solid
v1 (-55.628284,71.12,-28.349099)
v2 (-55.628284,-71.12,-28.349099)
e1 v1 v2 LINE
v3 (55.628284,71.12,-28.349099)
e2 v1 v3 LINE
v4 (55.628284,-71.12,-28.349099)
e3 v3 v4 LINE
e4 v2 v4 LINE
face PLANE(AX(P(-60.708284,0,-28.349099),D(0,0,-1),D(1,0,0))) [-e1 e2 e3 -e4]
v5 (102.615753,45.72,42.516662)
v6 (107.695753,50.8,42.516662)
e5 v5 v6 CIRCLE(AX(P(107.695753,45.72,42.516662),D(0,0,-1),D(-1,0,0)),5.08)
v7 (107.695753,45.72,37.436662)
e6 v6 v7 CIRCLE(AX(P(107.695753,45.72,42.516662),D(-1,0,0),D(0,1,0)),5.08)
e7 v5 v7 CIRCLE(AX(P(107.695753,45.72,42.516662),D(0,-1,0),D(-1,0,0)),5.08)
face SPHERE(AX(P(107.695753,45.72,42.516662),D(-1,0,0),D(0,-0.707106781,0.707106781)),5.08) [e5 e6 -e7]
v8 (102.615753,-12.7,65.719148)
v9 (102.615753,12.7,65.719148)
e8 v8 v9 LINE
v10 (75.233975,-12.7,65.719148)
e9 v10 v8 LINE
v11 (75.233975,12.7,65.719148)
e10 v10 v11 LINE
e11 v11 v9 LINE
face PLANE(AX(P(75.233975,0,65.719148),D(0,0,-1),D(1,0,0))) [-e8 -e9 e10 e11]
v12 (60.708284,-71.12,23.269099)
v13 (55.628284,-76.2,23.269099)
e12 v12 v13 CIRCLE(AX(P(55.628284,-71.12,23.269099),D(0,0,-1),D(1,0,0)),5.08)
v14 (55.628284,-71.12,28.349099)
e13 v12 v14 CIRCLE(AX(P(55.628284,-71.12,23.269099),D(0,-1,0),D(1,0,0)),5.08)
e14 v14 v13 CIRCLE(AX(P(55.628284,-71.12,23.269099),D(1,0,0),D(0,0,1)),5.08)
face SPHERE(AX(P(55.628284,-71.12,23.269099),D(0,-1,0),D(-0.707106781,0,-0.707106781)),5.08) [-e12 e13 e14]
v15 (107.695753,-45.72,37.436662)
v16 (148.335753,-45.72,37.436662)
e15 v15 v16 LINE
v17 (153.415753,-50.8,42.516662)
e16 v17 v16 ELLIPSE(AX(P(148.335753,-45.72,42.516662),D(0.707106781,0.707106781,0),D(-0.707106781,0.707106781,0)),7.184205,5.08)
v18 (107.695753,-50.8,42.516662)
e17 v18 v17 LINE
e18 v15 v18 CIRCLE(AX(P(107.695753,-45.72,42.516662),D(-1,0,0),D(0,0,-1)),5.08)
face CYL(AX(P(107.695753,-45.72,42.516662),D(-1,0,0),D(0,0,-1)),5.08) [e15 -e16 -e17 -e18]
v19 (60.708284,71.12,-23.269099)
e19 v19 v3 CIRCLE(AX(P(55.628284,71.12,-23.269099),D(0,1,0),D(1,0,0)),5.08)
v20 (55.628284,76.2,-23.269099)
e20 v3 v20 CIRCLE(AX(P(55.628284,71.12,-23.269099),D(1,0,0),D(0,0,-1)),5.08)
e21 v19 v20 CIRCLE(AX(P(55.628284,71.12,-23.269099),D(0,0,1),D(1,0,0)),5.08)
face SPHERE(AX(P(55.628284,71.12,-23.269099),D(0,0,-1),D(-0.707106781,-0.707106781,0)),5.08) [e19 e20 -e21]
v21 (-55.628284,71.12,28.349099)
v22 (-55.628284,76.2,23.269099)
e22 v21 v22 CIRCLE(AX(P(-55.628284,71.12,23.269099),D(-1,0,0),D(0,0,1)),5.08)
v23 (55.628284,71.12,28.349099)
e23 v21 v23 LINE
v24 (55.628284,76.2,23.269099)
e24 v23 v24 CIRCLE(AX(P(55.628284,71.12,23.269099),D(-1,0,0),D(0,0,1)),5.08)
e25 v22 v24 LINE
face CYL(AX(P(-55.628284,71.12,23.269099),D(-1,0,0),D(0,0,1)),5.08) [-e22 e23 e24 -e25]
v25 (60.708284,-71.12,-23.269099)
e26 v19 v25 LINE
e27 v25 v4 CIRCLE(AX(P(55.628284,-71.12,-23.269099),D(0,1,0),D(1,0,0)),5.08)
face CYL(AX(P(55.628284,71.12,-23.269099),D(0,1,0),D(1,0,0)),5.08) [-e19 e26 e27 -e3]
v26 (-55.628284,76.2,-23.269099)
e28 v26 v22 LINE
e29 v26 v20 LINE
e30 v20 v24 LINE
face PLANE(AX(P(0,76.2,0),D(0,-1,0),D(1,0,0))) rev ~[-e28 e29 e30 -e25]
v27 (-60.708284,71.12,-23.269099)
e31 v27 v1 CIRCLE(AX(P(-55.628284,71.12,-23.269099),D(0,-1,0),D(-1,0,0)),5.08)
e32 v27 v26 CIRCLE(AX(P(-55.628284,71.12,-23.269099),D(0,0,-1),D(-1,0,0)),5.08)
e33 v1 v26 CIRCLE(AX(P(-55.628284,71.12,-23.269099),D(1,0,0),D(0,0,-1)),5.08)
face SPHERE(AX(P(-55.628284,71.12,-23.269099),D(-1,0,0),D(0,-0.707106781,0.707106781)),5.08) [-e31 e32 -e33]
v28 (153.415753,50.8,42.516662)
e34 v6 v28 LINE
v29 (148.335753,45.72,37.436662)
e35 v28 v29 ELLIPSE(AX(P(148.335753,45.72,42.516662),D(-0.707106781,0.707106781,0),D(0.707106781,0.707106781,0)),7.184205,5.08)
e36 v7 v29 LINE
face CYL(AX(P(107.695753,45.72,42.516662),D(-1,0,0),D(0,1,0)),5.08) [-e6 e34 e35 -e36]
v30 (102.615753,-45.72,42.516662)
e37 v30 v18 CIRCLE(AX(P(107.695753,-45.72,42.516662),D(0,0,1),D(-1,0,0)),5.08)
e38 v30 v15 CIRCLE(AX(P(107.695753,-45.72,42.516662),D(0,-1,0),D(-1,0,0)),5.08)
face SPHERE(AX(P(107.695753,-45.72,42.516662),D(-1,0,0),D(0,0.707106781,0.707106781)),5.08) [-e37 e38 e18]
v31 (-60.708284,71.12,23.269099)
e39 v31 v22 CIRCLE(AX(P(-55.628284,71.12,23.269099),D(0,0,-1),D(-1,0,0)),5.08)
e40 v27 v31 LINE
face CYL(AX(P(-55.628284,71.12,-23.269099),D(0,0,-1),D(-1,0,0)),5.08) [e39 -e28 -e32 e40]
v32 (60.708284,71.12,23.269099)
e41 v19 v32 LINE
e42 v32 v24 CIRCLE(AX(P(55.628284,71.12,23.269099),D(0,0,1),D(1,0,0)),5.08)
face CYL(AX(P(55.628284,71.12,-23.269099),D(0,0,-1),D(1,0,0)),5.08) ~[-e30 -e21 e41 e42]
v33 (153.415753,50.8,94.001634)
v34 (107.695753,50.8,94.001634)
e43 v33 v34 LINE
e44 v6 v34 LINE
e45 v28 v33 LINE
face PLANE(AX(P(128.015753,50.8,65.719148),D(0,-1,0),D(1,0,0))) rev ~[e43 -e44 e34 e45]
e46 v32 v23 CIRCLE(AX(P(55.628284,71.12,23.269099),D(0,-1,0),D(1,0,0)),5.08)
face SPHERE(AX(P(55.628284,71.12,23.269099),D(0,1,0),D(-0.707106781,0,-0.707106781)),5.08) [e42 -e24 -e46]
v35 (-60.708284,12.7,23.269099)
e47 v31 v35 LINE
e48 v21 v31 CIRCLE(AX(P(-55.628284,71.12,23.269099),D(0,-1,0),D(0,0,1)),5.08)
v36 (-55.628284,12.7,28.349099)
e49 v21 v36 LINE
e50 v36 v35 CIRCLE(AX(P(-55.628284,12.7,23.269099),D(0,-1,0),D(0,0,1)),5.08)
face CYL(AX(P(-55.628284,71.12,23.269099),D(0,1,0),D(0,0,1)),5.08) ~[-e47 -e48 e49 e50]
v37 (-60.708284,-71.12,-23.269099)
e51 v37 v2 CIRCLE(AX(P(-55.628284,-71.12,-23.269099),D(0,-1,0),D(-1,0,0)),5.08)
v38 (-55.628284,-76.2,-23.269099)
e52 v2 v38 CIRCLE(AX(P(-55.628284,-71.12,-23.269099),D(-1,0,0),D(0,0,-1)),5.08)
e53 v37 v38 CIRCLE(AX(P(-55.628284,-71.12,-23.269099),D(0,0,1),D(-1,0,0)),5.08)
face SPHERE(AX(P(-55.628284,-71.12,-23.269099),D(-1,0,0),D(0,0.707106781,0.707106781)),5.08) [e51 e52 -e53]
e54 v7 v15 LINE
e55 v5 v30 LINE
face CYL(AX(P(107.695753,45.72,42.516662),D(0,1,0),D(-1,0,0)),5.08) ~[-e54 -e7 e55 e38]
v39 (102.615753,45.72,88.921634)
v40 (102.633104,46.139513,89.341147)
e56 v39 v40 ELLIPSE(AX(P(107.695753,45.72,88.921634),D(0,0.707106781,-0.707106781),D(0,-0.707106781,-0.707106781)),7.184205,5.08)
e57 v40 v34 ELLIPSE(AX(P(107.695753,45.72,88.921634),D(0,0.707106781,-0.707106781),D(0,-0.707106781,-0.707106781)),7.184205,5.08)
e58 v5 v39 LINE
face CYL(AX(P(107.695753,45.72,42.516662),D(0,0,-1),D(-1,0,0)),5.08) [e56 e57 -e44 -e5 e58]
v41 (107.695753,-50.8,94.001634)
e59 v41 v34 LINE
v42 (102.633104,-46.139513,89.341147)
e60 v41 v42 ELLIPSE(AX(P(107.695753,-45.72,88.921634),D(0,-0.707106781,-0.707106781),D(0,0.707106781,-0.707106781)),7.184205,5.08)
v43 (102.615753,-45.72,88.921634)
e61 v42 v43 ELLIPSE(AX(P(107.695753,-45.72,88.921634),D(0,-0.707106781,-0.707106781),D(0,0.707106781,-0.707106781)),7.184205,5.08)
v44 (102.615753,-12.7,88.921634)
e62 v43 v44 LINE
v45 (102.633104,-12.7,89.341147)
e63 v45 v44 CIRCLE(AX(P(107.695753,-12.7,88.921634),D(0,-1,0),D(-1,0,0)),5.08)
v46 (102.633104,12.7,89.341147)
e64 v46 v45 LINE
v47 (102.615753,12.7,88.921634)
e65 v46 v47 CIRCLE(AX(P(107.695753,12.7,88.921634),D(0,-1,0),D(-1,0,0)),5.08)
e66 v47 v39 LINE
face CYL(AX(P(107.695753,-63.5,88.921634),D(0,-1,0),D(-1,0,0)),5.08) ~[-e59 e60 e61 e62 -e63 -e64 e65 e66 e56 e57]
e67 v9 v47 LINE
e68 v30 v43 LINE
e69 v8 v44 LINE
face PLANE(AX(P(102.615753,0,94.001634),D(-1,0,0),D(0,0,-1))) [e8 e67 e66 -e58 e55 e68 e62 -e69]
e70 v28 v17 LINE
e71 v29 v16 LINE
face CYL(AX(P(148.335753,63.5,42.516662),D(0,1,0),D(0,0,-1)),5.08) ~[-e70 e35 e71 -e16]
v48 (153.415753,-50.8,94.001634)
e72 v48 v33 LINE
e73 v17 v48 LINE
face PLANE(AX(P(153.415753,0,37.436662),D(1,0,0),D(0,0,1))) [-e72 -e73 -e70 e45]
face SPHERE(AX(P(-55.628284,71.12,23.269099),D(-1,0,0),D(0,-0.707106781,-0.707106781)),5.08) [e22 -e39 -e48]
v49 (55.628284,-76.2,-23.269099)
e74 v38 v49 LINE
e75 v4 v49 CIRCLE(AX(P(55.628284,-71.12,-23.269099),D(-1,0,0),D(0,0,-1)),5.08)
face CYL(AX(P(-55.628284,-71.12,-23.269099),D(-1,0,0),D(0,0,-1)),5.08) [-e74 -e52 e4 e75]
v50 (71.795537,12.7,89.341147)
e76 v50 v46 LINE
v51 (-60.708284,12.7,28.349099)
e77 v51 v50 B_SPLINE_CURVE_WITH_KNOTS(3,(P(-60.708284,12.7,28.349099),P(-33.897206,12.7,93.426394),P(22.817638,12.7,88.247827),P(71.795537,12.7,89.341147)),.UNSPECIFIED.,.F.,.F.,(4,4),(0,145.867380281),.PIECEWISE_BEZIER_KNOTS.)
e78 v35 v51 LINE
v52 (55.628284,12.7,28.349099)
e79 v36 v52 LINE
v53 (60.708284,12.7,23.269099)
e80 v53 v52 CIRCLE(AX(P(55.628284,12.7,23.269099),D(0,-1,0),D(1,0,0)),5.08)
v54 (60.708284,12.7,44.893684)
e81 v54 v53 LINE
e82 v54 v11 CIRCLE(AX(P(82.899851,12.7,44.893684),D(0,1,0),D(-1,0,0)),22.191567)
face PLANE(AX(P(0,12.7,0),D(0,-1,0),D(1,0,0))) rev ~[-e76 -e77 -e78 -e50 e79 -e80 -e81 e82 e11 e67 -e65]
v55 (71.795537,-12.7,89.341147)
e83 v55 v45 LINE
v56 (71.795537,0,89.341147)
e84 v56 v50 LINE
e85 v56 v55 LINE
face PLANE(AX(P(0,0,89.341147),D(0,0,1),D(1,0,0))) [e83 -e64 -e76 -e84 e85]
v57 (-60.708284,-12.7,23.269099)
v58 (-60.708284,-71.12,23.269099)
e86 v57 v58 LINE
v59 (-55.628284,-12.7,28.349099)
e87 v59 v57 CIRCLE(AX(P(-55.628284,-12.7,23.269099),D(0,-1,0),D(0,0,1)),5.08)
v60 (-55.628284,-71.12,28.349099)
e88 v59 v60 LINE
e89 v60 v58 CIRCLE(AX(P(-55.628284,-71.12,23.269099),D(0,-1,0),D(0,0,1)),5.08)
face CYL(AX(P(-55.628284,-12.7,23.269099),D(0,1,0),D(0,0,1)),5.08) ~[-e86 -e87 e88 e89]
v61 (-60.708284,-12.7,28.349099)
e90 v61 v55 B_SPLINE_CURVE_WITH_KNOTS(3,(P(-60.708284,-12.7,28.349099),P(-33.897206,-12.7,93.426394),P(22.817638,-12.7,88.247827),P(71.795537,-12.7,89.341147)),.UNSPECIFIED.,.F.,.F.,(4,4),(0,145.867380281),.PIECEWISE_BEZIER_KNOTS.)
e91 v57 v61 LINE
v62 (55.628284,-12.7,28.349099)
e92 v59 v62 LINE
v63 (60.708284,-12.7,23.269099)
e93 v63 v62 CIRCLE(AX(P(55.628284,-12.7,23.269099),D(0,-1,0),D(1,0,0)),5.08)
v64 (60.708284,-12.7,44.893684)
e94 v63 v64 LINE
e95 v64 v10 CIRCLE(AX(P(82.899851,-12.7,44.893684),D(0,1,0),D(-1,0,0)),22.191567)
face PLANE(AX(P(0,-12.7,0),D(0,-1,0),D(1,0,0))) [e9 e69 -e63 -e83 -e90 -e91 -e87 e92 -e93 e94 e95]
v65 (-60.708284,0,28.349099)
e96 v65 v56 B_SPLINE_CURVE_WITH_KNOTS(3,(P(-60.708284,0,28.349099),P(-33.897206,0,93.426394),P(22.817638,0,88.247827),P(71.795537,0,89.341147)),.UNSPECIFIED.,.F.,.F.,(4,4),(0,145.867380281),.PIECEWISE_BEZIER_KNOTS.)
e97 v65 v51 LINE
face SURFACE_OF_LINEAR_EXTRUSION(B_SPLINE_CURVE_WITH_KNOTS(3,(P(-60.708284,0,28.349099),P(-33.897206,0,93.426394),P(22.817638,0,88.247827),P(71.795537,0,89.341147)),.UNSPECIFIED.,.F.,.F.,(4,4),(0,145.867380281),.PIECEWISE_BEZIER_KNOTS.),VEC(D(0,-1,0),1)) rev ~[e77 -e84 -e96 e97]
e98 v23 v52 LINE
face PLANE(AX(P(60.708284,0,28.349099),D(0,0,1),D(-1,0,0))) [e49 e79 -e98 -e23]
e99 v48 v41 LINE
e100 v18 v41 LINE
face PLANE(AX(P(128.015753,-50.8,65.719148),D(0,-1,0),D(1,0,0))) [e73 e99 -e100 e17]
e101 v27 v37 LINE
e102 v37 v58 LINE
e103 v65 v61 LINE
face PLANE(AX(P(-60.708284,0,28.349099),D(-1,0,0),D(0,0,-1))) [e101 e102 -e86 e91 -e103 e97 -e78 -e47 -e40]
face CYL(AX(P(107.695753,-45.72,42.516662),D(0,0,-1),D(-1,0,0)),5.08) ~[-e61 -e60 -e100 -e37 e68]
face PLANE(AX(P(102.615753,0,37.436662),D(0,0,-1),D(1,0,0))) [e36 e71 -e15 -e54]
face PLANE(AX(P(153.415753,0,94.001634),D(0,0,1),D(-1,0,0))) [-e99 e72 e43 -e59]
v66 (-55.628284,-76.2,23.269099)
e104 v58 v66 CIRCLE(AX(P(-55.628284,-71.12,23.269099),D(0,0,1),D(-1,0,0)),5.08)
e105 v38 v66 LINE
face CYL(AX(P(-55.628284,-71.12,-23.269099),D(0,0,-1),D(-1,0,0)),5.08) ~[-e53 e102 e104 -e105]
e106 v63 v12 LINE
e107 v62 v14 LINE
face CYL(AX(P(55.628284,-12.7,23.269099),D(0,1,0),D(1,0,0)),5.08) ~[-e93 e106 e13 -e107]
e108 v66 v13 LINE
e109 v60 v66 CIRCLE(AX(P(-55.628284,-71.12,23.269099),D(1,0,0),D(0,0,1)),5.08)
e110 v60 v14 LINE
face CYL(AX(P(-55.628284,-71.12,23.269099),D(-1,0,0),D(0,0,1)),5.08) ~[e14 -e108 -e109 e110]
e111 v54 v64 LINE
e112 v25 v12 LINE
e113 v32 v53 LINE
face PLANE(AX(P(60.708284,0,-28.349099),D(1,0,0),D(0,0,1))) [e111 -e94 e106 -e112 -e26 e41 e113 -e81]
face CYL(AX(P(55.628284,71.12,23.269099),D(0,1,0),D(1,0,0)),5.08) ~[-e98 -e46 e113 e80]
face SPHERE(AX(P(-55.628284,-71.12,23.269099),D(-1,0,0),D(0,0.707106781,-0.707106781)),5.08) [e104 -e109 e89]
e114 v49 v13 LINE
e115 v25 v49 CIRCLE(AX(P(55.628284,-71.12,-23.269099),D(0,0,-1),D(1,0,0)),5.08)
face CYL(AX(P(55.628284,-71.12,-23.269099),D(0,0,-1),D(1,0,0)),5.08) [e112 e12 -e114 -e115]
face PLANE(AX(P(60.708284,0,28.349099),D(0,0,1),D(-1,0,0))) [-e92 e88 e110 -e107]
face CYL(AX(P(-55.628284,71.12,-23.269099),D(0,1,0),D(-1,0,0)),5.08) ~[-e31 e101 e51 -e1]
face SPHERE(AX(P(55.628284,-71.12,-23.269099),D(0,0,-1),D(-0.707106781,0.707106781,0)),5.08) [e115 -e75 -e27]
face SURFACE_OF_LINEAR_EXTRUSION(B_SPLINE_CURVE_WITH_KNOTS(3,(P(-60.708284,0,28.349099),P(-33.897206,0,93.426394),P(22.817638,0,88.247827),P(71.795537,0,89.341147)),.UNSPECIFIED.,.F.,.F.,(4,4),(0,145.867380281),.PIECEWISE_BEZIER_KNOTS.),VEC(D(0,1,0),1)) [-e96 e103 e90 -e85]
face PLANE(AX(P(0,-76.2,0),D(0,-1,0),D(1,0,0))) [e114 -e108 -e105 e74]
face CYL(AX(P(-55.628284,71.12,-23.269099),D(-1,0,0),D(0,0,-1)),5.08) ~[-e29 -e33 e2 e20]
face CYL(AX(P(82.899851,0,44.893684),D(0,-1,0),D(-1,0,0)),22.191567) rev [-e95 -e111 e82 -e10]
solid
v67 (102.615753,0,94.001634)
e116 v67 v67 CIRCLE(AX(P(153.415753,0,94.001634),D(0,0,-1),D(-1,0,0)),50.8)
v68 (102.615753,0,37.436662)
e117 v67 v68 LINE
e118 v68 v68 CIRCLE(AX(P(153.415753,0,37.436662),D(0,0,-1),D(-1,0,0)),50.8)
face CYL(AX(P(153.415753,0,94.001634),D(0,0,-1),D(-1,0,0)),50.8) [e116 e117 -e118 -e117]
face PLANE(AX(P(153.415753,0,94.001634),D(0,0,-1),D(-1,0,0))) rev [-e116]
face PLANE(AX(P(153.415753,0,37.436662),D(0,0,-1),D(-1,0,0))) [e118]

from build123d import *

# Parameters (mm, degrees)
F1_DEPTH     = 76.2
F2_DEPTH     = 12.7
F3_DEPTH     = 50.8
F4_T1_DEPTH  = 111.2565687561
F4_T3_DEPTH  = 46.5381988824
F4_T5_DEPTH  = 58.42
F4_T7_DEPTH  = 58.42
F4_T9_DEPTH  = 142.24
F4_T11_DEPTH = 127
F4_T13_DEPTH = 64.1849718046
F4_T15_DEPTH = 58.42
F4_T17_DEPTH = 91.44
F4_S21_W     = 5.1816
F4_S21_H     = 5.1816
F4_T22_DEPTH = 5.1816
F4_S27_W     = 5.1816
F4_S27_H     = 5.1816
F4_T28_DEPTH = 5.1816
F4_S33_W     = 5.1816
F4_S33_H     = 5.1816
F4_T34_DEPTH = 5.1816
F4_S39_W     = 5.1816
F4_S39_H     = 5.1816
F4_T40_DEPTH = 5.1816
F4_S45_W     = 5.1816
F4_S45_H     = 5.1816
F4_T46_DEPTH = 5.1816
F4_S51_W     = 5.1816
F4_S51_H     = 5.1816
F4_T52_DEPTH = 5.1816
F4_S57_W     = 5.1816
F4_S57_H     = 5.1816
F4_T58_DEPTH = 5.1816
F4_S63_W     = 5.1816
F4_S63_H     = 5.1816
F4_T64_DEPTH = 5.1816
F4_S69_W     = 5.1816
F4_S69_H     = 5.1816
F4_T70_DEPTH = 5.1816
F4_S75_W     = 5.1816
F4_S75_H     = 5.1816
F4_T76_DEPTH = 5.1816
F4_T82_DEPTH = 127
F4_T87_DEPTH = 127
F4_T92_DEPTH = 127


# Not quite as in the source:
# - a fillet or chamfer that OpenCascade refuses, or shapes differently, is made with other operations: its cross-section is extruded or revolved along the edge and cut away or added


with BuildPart() as f1:
    # F0 (on Front) → F1 (new body, symmetric)
    with BuildSketch(Plane.XZ):
        Polygon((-60.7082843781, -28.3490994412), (60.7082843781, -28.3490994412), (60.7082843781, 28.3490994412), (37.0862856507, 28.3490994412), (-60.7082843781, 28.3490994412), align=None)
    extrude(amount=F1_DEPTH, both=True)

    # F0 (on Front) → F2 (join, symmetric)
    with BuildSketch(Plane.XZ):
        with BuildLine():
            add(Edge.make_bspline(
                [(-60.7082843781, 28.3490994412), (-33.8972061735, 93.4263938061), (22.8176377988, 88.2478274848), (71.7955373972, 89.3411468321)],
                knots=[0, 0, 0, 0, 145.8673802807, 145.8673802807, 145.8673802807, 145.8673802807], degree=3))
            Line((-60.7082843781, 28.3490994412), (37.0862856507, 28.3490994412))
            Line((37.0862856507, 28.3490994412), (37.0862856507, 44.8936835745))
            ThreePointArc((37.0862856507, 44.8936835745), (46.7916042484, 73.0907984395), (71.7955373972, 89.3411468321))
        make_face()
        with BuildLine():
            Line((37.0862856507, 28.3490994412), (60.7082843781, 28.3490994412))
            Line((60.7082843781, 28.3490994412), (60.7082843781, 44.8936835745))
            ThreePointArc((60.7082843781, 44.8936835745), (64.6984303206, 57.5891124549), (75.2339748927, 65.7191481047))
            Line((75.2339748927, 65.7191481047), (102.6157526561, 65.7191481047))
            Line((102.6157526561, 65.7191481047), (102.6157526561, 89.3411468321))
            Line((102.6157526561, 89.3411468321), (71.7955373972, 89.3411468321))
            ThreePointArc((71.7955373972, 89.3411468321), (46.7916042484, 73.0907984395), (37.0862856507, 44.8936835745))
            Line((37.0862856507, 44.8936835745), (37.0862856507, 28.3490994412))
        make_face()
    extrude(amount=F2_DEPTH, both=True)

    # F0 (on Front) → F3 (join, symmetric)
    with BuildSketch(Plane.XZ):
        Polygon((102.6157526561, 94.0016340071), (102.6157526561, 89.3411468321), (102.6157526561, 65.7191481047), (102.6157526561, 37.4366622024), (153.4157526561, 37.4366622024), (153.4157526561, 94.0016340071), align=None)
    extrude(amount=F3_DEPTH, both=True)

    # F4: fillet of radius 5.08 on 21 edges, made by hand

    # F4_s2 → F4_t1 (cut)
    with BuildSketch(Plane.YZ.offset(-55.6282843781)):
        with BuildLine():
            ThreePointArc((71.12, 28.3490994412), (74.7121024484, 26.8612018896), (76.2, 23.2690994412))
            Line((76.2, 23.2690994412), (76.2, 28.3490994412))
            Line((76.2, 28.3490994412), (71.12, 28.3490994412))
        make_face()
        with BuildLine():
            ThreePointArc((71.12, -28.3490994412), (74.7121024484, -26.8612018896), (76.2, -23.2690994412))
            Line((76.2, -23.2690994412), (76.2, -28.3490994412))
            Line((76.2, -28.3490994412), (71.12, -28.3490994412))
        make_face()
        with BuildLine():
            ThreePointArc((-71.12, 28.3490994412), (-74.7121024484, 26.8612018896), (-76.2, 23.2690994412))
            Line((-76.2, 23.2690994412), (-76.2, 28.3490994412))
            Line((-76.2, 28.3490994412), (-71.12, 28.3490994412))
        make_face()
        with BuildLine():
            ThreePointArc((-71.12, -28.3490994412), (-74.7121024484, -26.8612018896), (-76.2, -23.2690994412))
            Line((-76.2, -23.2690994412), (-76.2, -28.3490994412))
            Line((-76.2, -28.3490994412), (-71.12, -28.3490994412))
        make_face()
    extrude(amount=F4_T1_DEPTH, mode=Mode.SUBTRACT)

    # F4_s4 → F4_t3 (cut)
    with BuildSketch(Plane.XY.offset(-23.2690994412)):
        with BuildLine():
            ThreePointArc((-60.7082843781, 71.12), (-59.2203868265, 74.7121024484), (-55.6282843781, 76.2))
            Line((-55.6282843781, 76.2), (-60.7082843781, 76.2))
            Line((-60.7082843781, 76.2), (-60.7082843781, 71.12))
        make_face()
        with BuildLine():
            ThreePointArc((60.7082843781, 71.12), (59.2203868265, 74.7121024484), (55.6282843781, 76.2))
            Line((55.6282843781, 76.2), (60.7082843781, 76.2))
            Line((60.7082843781, 76.2), (60.7082843781, 71.12))
        make_face()
        with BuildLine():
            ThreePointArc((60.7082843781, -71.12), (59.2203868265, -74.7121024484), (55.6282843781, -76.2))
            Line((55.6282843781, -76.2), (60.7082843781, -76.2))
            Line((60.7082843781, -76.2), (60.7082843781, -71.12))
        make_face()
        with BuildLine():
            ThreePointArc((-60.7082843781, -71.12), (-59.2203868265, -74.7121024484), (-55.6282843781, -76.2))
            Line((-55.6282843781, -76.2), (-60.7082843781, -76.2))
            Line((-60.7082843781, -76.2), (-60.7082843781, -71.12))
        make_face()
    extrude(amount=F4_T3_DEPTH, mode=Mode.SUBTRACT)

    # F4_s6 → F4_t5 (cut)
    with BuildSketch(Plane.XZ.offset(-71.12)):
        with BuildLine():
            ThreePointArc((-55.6282843781, 28.3490994412), (-59.2203868265, 26.8612018896), (-60.7082843781, 23.2690994412))
            Line((-60.7082843781, 23.2690994412), (-60.7082843781, 28.3490994412))
            Line((-60.7082843781, 28.3490994412), (-55.6282843781, 28.3490994412))
        make_face()
        with BuildLine():
            ThreePointArc((60.7082843781, 23.2690994412), (59.2203868265, 26.8612018896), (55.6282843781, 28.3490994412))
            Line((55.6282843781, 28.3490994412), (60.7082843781, 28.3490994412))
            Line((60.7082843781, 28.3490994412), (60.7082843781, 23.2690994412))
        make_face()
    extrude(amount=F4_T5_DEPTH, mode=Mode.SUBTRACT)

    # F4_s8 → F4_t7 (cut)
    with BuildSketch(Plane.XZ.offset(12.7)):
        with BuildLine():
            ThreePointArc((-55.6282843781, 28.3490994412), (-59.2203868265, 26.8612018896), (-60.7082843781, 23.2690994412))
            Line((-60.7082843781, 23.2690994412), (-60.7082843781, 28.3490994412))
            Line((-60.7082843781, 28.3490994412), (-55.6282843781, 28.3490994412))
        make_face()
        with BuildLine():
            ThreePointArc((60.7082843781, 23.2690994412), (59.2203868265, 26.8612018896), (55.6282843781, 28.3490994412))
            Line((55.6282843781, 28.3490994412), (60.7082843781, 28.3490994412))
            Line((60.7082843781, 28.3490994412), (60.7082843781, 23.2690994412))
        make_face()
    extrude(amount=F4_T7_DEPTH, mode=Mode.SUBTRACT)

    # F4_s10 → F4_t9 (cut)
    with BuildSketch(Plane.XZ.offset(-71.12)):
        with BuildLine():
            ThreePointArc((-60.7082843781, -23.2690994412), (-59.2203868265, -26.8612018896), (-55.6282843781, -28.3490994412))
            Line((-55.6282843781, -28.3490994412), (-60.7082843781, -28.3490994412))
            Line((-60.7082843781, -28.3490994412), (-60.7082843781, -23.2690994412))
        make_face()
        with BuildLine():
            ThreePointArc((60.7082843781, -23.2690994412), (59.2203868265, -26.8612018896), (55.6282843781, -28.3490994412))
            Line((55.6282843781, -28.3490994412), (60.7082843781, -28.3490994412))
            Line((60.7082843781, -28.3490994412), (60.7082843781, -23.2690994412))
        make_face()
    extrude(amount=F4_T9_DEPTH, mode=Mode.SUBTRACT)

    # F4_s12 → F4_t11 (cut)
    with BuildSketch(Plane.XZ.offset(-63.5)):
        with BuildLine():
            ThreePointArc((148.3357526561, 37.4366622024), (151.9278551045, 38.924559754), (153.4157526561, 42.5166622024))
            Line((153.4157526561, 42.5166622024), (153.4157526561, 37.4366622024))
            Line((153.4157526561, 37.4366622024), (148.3357526561, 37.4366622024))
        make_face()
    extrude(amount=F4_T11_DEPTH, mode=Mode.SUBTRACT)

    # F4_s14 → F4_t13 (cut)
    with BuildSketch(Plane.XY.offset(42.5166622024)):
        with BuildLine():
            ThreePointArc((102.6157526561, -45.72), (104.1036502077, -49.3121024484), (107.6957526561, -50.8))
            Line((107.6957526561, -50.8), (102.6157526561, -50.8))
            Line((102.6157526561, -50.8), (102.6157526561, -45.72))
        make_face()
        with BuildLine():
            ThreePointArc((102.6157526561, 45.72), (104.1036502077, 49.3121024484), (107.6957526561, 50.8))
            Line((107.6957526561, 50.8), (102.6157526561, 50.8))
            Line((102.6157526561, 50.8), (102.6157526561, 45.72))
        make_face()
    extrude(amount=F4_T13_DEPTH, mode=Mode.SUBTRACT)

    # F4_s16 → F4_t15 (cut)
    with BuildSketch(Plane.YZ.offset(107.6957526561)):
        with BuildLine():
            ThreePointArc((-45.72, 37.4366622024), (-49.3121024484, 38.924559754), (-50.8, 42.5166622024))
            Line((-50.8, 42.5166622024), (-50.8, 37.4366622024))
            Line((-50.8, 37.4366622024), (-45.72, 37.4366622024))
        make_face()
        with BuildLine():
            ThreePointArc((50.8, 42.5166622024), (49.3121024484, 38.924559754), (45.72, 37.4366622024))
            Line((45.72, 37.4366622024), (50.8, 37.4366622024))
            Line((50.8, 37.4366622024), (50.8, 42.5166622024))
        make_face()
    extrude(amount=F4_T15_DEPTH, mode=Mode.SUBTRACT)

    # F4_s18 → F4_t17 (cut)
    with BuildSketch(Plane.XZ.offset(-45.72)):
        with BuildLine():
            ThreePointArc((102.6157526561, 42.5166622024), (104.1036502077, 38.924559754), (107.6957526561, 37.4366622024))
            Line((107.6957526561, 37.4366622024), (102.6157526561, 37.4366622024))
            Line((102.6157526561, 37.4366622024), (102.6157526561, 42.5166622024))
        make_face()
    extrude(amount=F4_T17_DEPTH, mode=Mode.SUBTRACT)


with BuildPart() as f4_tool20:
    # F4_s21 → F4_t22 (new body)
    with BuildSketch(Plane.YZ.offset(-55.6282843781)):
        with Locations((73.7108, 25.8598994412)):
            Rectangle(F4_S21_W, F4_S21_H)
    extrude(amount=-F4_T22_DEPTH)

    # F4_s23 → F4_t24 (revolve, cut)
    with BuildSketch(Plane(origin=(-55.6282843781, 71.12, 23.2690994412), x_dir=(0, -0.7071067812, -0.7071067812), z_dir=(0, 0.7071067812, -0.7071067812))):
        with BuildLine():
            ThreePointArc((0, -5.08), (5.08, 0), (0, 5.08))
            Line((0, 5.08), (0, -5.08))
        make_face()
    revolve(axis=Axis((-55.6282843781, 71.12, 23.2690994412), (-1, 0, 0)), mode=Mode.SUBTRACT)


with BuildPart() as f1_1:
    add(f1.part)

    # F4_t19: cut F4_tool20
    add(f4_tool20.part, mode=Mode.SUBTRACT)


with BuildPart() as f4_tool26:
    # F4_s27 → F4_t28 (new body)
    with BuildSketch(Plane.XZ.offset(-71.12)):
        with Locations((58.2190843781, 25.8598994412)):
            Rectangle(F4_S27_W, F4_S27_H)
    extrude(amount=-F4_T28_DEPTH)

    # F4_s29 → F4_t30 (revolve, cut)
    with BuildSketch(Plane(origin=(55.6282843781, 71.12, 23.2690994412), x_dir=(-0.7071067812, 0, -0.7071067812), z_dir=(0.7071067812, 0, -0.7071067812))):
        with BuildLine():
            ThreePointArc((0, -5.08), (5.08, 0), (0, 5.08))
            Line((0, 5.08), (0, -5.08))
        make_face()
    revolve(axis=Axis((55.6282843781, 71.12, 23.2690994412), (0, 1, 0)), mode=Mode.SUBTRACT)


with BuildPart() as f1_2:
    add(f1_1.part)

    # F4_t25: cut F4_tool26
    add(f4_tool26.part, mode=Mode.SUBTRACT)


with BuildPart() as f4_tool32:
    # F4_s33 → F4_t34 (new body)
    with BuildSketch(Plane.YZ.offset(-55.6282843781)):
        with Locations((73.7108, -25.8598994412)):
            Rectangle(F4_S33_W, F4_S33_H)
    extrude(amount=-F4_T34_DEPTH)

    # F4_s35 → F4_t36 (revolve, cut)
    with BuildSketch(Plane(origin=(-55.6282843781, 71.12, -23.2690994412), x_dir=(0, -0.7071067812, 0.7071067812), z_dir=(0, -0.7071067812, -0.7071067812))):
        with BuildLine():
            ThreePointArc((0, -5.08), (5.08, 0), (0, 5.08))
            Line((0, 5.08), (0, -5.08))
        make_face()
    revolve(axis=Axis((-55.6282843781, 71.12, -23.2690994412), (-1, 0, 0)), mode=Mode.SUBTRACT)


with BuildPart() as f1_3:
    add(f1_2.part)

    # F4_t31: cut F4_tool32
    add(f4_tool32.part, mode=Mode.SUBTRACT)


with BuildPart() as f4_tool38:
    # F4_s39 → F4_t40 (new body)
    with BuildSketch(Plane.XY.offset(-23.2690994412)):
        with Locations((58.2190843781, 73.7108)):
            Rectangle(F4_S39_W, F4_S39_H)
    extrude(amount=-F4_T40_DEPTH)

    # F4_s41 → F4_t42 (revolve, cut)
    with BuildSketch(Plane(origin=(55.6282843781, 71.12, -23.2690994412), x_dir=(-0.7071067812, -0.7071067812, 0), z_dir=(0.7071067812, -0.7071067812, 0))):
        with BuildLine():
            ThreePointArc((0, -5.08), (5.08, 0), (0, 5.08))
            Line((0, 5.08), (0, -5.08))
        make_face()
    revolve(axis=Axis((55.6282843781, 71.12, -23.2690994412), (0, 0, -1)), mode=Mode.SUBTRACT)


with BuildPart() as f1_4:
    add(f1_3.part)

    # F4_t37: cut F4_tool38
    add(f4_tool38.part, mode=Mode.SUBTRACT)


with BuildPart() as f4_tool44:
    # F4_s45 → F4_t46 (new body)
    with BuildSketch(Plane.YZ.offset(-55.6282843781)):
        with Locations((-73.7108, 25.8598994412)):
            Rectangle(F4_S45_W, F4_S45_H)
    extrude(amount=-F4_T46_DEPTH)

    # F4_s47 → F4_t48 (revolve, cut)
    with BuildSketch(Plane(origin=(-55.6282843781, -71.12, 23.2690994412), x_dir=(0, 0.7071067812, -0.7071067812), z_dir=(0, 0.7071067812, 0.7071067812))):
        with BuildLine():
            ThreePointArc((0, -5.08), (5.08, 0), (0, 5.08))
            Line((0, 5.08), (0, -5.08))
        make_face()
    revolve(axis=Axis((-55.6282843781, -71.12, 23.2690994412), (-1, 0, 0)), mode=Mode.SUBTRACT)


with BuildPart() as f1_5:
    add(f1_4.part)

    # F4_t43: cut F4_tool44
    add(f4_tool44.part, mode=Mode.SUBTRACT)


with BuildPart() as f4_tool50:
    # F4_s51 → F4_t52 (new body)
    with BuildSketch(Plane.XZ.offset(71.12)):
        with Locations((58.2190843781, 25.8598994412)):
            Rectangle(F4_S51_W, F4_S51_H)
    extrude(amount=F4_T52_DEPTH)

    # F4_s53 → F4_t54 (revolve, cut)
    with BuildSketch(Plane(origin=(55.6282843781, -71.12, 23.2690994412), x_dir=(-0.7071067812, 0, -0.7071067812), z_dir=(-0.7071067812, 0, 0.7071067812))):
        with BuildLine():
            ThreePointArc((0, -5.08), (5.08, 0), (0, 5.08))
            Line((0, 5.08), (0, -5.08))
        make_face()
    revolve(axis=Axis((55.6282843781, -71.12, 23.2690994412), (0, -1, 0)), mode=Mode.SUBTRACT)


with BuildPart() as f1_6:
    add(f1_5.part)

    # F4_t49: cut F4_tool50
    add(f4_tool50.part, mode=Mode.SUBTRACT)


with BuildPart() as f4_tool56:
    # F4_s57 → F4_t58 (new body)
    with BuildSketch(Plane.YZ.offset(-55.6282843781)):
        with Locations((-73.7108, -25.8598994412)):
            Rectangle(F4_S57_W, F4_S57_H)
    extrude(amount=-F4_T58_DEPTH)

    # F4_s59 → F4_t60 (revolve, cut)
    with BuildSketch(Plane(origin=(-55.6282843781, -71.12, -23.2690994412), x_dir=(0, 0.7071067812, 0.7071067812), z_dir=(0, -0.7071067812, 0.7071067812))):
        with BuildLine():
            ThreePointArc((0, -5.08), (5.08, 0), (0, 5.08))
            Line((0, 5.08), (0, -5.08))
        make_face()
    revolve(axis=Axis((-55.6282843781, -71.12, -23.2690994412), (-1, 0, 0)), mode=Mode.SUBTRACT)


with BuildPart() as f1_7:
    add(f1_6.part)

    # F4_t55: cut F4_tool56
    add(f4_tool56.part, mode=Mode.SUBTRACT)


with BuildPart() as f4_tool62:
    # F4_s63 → F4_t64 (new body)
    with BuildSketch(Plane.XY.offset(-23.2690994412)):
        with Locations((58.2190843781, -73.7108)):
            Rectangle(F4_S63_W, F4_S63_H)
    extrude(amount=-F4_T64_DEPTH)

    # F4_s65 → F4_t66 (revolve, cut)
    with BuildSketch(Plane(origin=(55.6282843781, -71.12, -23.2690994412), x_dir=(-0.7071067812, 0.7071067812, 0), z_dir=(-0.7071067812, -0.7071067812, 0))):
        with BuildLine():
            ThreePointArc((0, -5.08), (5.08, 0), (0, 5.08))
            Line((0, 5.08), (0, -5.08))
        make_face()
    revolve(axis=Axis((55.6282843781, -71.12, -23.2690994412), (0, 0, -1)), mode=Mode.SUBTRACT)


with BuildPart() as f1_8:
    add(f1_7.part)

    # F4_t61: cut F4_tool62
    add(f4_tool62.part, mode=Mode.SUBTRACT)


with BuildPart() as f4_tool68:
    # F4_s69 → F4_t70 (new body)
    with BuildSketch(Plane.YZ.offset(107.6957526561)):
        with Locations((-48.3108, 39.9258622024)):
            Rectangle(F4_S69_W, F4_S69_H)
    extrude(amount=-F4_T70_DEPTH)

    # F4_s71 → F4_t72 (revolve, cut)
    with BuildSketch(Plane(origin=(107.6957526561, -45.72, 42.5166622024), x_dir=(0, 0.7071067812, 0.7071067812), z_dir=(0, -0.7071067812, 0.7071067812))):
        with BuildLine():
            ThreePointArc((0, -5.08), (5.08, 0), (0, 5.08))
            Line((0, 5.08), (0, -5.08))
        make_face()
    revolve(axis=Axis((107.6957526561, -45.72, 42.5166622024), (-1, 0, 0)), mode=Mode.SUBTRACT)


with BuildPart() as f1_9:
    add(f1_8.part)

    # F4_t67: cut F4_tool68
    add(f4_tool68.part, mode=Mode.SUBTRACT)


with BuildPart() as f4_tool74:
    # F4_s75 → F4_t76 (new body)
    with BuildSketch(Plane.YZ.offset(107.6957526561)):
        with Locations((48.3108, 39.9258622024)):
            Rectangle(F4_S75_W, F4_S75_H)
    extrude(amount=-F4_T76_DEPTH)

    # F4_s77 → F4_t78 (revolve, cut)
    with BuildSketch(Plane(origin=(107.6957526561, 45.72, 42.5166622024), x_dir=(0, -0.7071067812, 0.7071067812), z_dir=(0, -0.7071067812, -0.7071067812))):
        with BuildLine():
            ThreePointArc((0, -5.08), (5.08, 0), (0, 5.08))
            Line((0, 5.08), (0, -5.08))
        make_face()
    revolve(axis=Axis((107.6957526561, 45.72, 42.5166622024), (-1, 0, 0)), mode=Mode.SUBTRACT)


with BuildPart() as f1_10:
    add(f1_9.part)

    # F4_t73: cut F4_tool74
    add(f4_tool74.part, mode=Mode.SUBTRACT)


with BuildPart() as f4_tool80:
    # F4_s81 → F4_t82 (new body)
    with BuildSketch(Plane.XZ.offset(63.5)):
        with BuildLine():
            ThreePointArc((102.6157526561, 88.9216340071), (104.1036502077, 92.5137364555), (107.6957526561, 94.0016340071))
            Line((107.6957526561, 94.0016340071), (102.6157526561, 94.0016340071))
            Line((102.6157526561, 94.0016340071), (102.6157526561, 88.9216340071))
        make_face()
    extrude(amount=-F4_T82_DEPTH)

    split(bisect_by=Plane.XZ.offset(12.7), keep=Keep.TOP)


with BuildPart() as f1_11:
    add(f1_10.part)

    # F4_t79: cut F4_tool80
    add(f4_tool80.part, mode=Mode.SUBTRACT)


with BuildPart() as f4_tool85:
    # F4_s86 → F4_t87 (new body)
    with BuildSketch(Plane.XZ.offset(63.5)):
        with BuildLine():
            ThreePointArc((102.6157526561, 88.9216340071), (104.1036502077, 92.5137364555), (107.6957526561, 94.0016340071))
            Line((107.6957526561, 94.0016340071), (102.6157526561, 94.0016340071))
            Line((102.6157526561, 94.0016340071), (102.6157526561, 88.9216340071))
        make_face()
    extrude(amount=-F4_T87_DEPTH)

    split(bisect_by=Plane.XY.offset(89.3411468321), keep=Keep.TOP)


with BuildPart() as f1_12:
    add(f1_11.part)

    # F4_t84: cut F4_tool85
    add(f4_tool85.part, mode=Mode.SUBTRACT)


with BuildPart() as f4_tool90:
    # F4_s91 → F4_t92 (new body)
    with BuildSketch(Plane.XZ.offset(63.5)):
        with BuildLine():
            ThreePointArc((102.6157526561, 88.9216340071), (104.1036502077, 92.5137364555), (107.6957526561, 94.0016340071))
            Line((107.6957526561, 94.0016340071), (102.6157526561, 94.0016340071))
            Line((102.6157526561, 94.0016340071), (102.6157526561, 88.9216340071))
        make_face()
    extrude(amount=-F4_T92_DEPTH)

    split(bisect_by=Plane.XZ.offset(-12.7), keep=Keep.BOTTOM)


with BuildPart() as f1_13:
    add(f1_12.part)

    # F4_t89: cut F4_tool90
    add(f4_tool90.part, mode=Mode.SUBTRACT)


with BuildPart() as f5:
    # F0 (on Front) → F5 (revolve)
    with BuildSketch(Plane.XZ):
        Polygon((102.6157526561, 94.0016340071), (102.6157526561, 89.3411468321), (102.6157526561, 65.7191481047), (102.6157526561, 37.4366622024), (153.4157526561, 37.4366622024), (153.4157526561, 94.0016340071), align=None)
    revolve(axis=Axis((153.4157526561, 0, 65.7191481047), (0, 0, -1)))


solid = Compound([f1_13.part, f5.part])
